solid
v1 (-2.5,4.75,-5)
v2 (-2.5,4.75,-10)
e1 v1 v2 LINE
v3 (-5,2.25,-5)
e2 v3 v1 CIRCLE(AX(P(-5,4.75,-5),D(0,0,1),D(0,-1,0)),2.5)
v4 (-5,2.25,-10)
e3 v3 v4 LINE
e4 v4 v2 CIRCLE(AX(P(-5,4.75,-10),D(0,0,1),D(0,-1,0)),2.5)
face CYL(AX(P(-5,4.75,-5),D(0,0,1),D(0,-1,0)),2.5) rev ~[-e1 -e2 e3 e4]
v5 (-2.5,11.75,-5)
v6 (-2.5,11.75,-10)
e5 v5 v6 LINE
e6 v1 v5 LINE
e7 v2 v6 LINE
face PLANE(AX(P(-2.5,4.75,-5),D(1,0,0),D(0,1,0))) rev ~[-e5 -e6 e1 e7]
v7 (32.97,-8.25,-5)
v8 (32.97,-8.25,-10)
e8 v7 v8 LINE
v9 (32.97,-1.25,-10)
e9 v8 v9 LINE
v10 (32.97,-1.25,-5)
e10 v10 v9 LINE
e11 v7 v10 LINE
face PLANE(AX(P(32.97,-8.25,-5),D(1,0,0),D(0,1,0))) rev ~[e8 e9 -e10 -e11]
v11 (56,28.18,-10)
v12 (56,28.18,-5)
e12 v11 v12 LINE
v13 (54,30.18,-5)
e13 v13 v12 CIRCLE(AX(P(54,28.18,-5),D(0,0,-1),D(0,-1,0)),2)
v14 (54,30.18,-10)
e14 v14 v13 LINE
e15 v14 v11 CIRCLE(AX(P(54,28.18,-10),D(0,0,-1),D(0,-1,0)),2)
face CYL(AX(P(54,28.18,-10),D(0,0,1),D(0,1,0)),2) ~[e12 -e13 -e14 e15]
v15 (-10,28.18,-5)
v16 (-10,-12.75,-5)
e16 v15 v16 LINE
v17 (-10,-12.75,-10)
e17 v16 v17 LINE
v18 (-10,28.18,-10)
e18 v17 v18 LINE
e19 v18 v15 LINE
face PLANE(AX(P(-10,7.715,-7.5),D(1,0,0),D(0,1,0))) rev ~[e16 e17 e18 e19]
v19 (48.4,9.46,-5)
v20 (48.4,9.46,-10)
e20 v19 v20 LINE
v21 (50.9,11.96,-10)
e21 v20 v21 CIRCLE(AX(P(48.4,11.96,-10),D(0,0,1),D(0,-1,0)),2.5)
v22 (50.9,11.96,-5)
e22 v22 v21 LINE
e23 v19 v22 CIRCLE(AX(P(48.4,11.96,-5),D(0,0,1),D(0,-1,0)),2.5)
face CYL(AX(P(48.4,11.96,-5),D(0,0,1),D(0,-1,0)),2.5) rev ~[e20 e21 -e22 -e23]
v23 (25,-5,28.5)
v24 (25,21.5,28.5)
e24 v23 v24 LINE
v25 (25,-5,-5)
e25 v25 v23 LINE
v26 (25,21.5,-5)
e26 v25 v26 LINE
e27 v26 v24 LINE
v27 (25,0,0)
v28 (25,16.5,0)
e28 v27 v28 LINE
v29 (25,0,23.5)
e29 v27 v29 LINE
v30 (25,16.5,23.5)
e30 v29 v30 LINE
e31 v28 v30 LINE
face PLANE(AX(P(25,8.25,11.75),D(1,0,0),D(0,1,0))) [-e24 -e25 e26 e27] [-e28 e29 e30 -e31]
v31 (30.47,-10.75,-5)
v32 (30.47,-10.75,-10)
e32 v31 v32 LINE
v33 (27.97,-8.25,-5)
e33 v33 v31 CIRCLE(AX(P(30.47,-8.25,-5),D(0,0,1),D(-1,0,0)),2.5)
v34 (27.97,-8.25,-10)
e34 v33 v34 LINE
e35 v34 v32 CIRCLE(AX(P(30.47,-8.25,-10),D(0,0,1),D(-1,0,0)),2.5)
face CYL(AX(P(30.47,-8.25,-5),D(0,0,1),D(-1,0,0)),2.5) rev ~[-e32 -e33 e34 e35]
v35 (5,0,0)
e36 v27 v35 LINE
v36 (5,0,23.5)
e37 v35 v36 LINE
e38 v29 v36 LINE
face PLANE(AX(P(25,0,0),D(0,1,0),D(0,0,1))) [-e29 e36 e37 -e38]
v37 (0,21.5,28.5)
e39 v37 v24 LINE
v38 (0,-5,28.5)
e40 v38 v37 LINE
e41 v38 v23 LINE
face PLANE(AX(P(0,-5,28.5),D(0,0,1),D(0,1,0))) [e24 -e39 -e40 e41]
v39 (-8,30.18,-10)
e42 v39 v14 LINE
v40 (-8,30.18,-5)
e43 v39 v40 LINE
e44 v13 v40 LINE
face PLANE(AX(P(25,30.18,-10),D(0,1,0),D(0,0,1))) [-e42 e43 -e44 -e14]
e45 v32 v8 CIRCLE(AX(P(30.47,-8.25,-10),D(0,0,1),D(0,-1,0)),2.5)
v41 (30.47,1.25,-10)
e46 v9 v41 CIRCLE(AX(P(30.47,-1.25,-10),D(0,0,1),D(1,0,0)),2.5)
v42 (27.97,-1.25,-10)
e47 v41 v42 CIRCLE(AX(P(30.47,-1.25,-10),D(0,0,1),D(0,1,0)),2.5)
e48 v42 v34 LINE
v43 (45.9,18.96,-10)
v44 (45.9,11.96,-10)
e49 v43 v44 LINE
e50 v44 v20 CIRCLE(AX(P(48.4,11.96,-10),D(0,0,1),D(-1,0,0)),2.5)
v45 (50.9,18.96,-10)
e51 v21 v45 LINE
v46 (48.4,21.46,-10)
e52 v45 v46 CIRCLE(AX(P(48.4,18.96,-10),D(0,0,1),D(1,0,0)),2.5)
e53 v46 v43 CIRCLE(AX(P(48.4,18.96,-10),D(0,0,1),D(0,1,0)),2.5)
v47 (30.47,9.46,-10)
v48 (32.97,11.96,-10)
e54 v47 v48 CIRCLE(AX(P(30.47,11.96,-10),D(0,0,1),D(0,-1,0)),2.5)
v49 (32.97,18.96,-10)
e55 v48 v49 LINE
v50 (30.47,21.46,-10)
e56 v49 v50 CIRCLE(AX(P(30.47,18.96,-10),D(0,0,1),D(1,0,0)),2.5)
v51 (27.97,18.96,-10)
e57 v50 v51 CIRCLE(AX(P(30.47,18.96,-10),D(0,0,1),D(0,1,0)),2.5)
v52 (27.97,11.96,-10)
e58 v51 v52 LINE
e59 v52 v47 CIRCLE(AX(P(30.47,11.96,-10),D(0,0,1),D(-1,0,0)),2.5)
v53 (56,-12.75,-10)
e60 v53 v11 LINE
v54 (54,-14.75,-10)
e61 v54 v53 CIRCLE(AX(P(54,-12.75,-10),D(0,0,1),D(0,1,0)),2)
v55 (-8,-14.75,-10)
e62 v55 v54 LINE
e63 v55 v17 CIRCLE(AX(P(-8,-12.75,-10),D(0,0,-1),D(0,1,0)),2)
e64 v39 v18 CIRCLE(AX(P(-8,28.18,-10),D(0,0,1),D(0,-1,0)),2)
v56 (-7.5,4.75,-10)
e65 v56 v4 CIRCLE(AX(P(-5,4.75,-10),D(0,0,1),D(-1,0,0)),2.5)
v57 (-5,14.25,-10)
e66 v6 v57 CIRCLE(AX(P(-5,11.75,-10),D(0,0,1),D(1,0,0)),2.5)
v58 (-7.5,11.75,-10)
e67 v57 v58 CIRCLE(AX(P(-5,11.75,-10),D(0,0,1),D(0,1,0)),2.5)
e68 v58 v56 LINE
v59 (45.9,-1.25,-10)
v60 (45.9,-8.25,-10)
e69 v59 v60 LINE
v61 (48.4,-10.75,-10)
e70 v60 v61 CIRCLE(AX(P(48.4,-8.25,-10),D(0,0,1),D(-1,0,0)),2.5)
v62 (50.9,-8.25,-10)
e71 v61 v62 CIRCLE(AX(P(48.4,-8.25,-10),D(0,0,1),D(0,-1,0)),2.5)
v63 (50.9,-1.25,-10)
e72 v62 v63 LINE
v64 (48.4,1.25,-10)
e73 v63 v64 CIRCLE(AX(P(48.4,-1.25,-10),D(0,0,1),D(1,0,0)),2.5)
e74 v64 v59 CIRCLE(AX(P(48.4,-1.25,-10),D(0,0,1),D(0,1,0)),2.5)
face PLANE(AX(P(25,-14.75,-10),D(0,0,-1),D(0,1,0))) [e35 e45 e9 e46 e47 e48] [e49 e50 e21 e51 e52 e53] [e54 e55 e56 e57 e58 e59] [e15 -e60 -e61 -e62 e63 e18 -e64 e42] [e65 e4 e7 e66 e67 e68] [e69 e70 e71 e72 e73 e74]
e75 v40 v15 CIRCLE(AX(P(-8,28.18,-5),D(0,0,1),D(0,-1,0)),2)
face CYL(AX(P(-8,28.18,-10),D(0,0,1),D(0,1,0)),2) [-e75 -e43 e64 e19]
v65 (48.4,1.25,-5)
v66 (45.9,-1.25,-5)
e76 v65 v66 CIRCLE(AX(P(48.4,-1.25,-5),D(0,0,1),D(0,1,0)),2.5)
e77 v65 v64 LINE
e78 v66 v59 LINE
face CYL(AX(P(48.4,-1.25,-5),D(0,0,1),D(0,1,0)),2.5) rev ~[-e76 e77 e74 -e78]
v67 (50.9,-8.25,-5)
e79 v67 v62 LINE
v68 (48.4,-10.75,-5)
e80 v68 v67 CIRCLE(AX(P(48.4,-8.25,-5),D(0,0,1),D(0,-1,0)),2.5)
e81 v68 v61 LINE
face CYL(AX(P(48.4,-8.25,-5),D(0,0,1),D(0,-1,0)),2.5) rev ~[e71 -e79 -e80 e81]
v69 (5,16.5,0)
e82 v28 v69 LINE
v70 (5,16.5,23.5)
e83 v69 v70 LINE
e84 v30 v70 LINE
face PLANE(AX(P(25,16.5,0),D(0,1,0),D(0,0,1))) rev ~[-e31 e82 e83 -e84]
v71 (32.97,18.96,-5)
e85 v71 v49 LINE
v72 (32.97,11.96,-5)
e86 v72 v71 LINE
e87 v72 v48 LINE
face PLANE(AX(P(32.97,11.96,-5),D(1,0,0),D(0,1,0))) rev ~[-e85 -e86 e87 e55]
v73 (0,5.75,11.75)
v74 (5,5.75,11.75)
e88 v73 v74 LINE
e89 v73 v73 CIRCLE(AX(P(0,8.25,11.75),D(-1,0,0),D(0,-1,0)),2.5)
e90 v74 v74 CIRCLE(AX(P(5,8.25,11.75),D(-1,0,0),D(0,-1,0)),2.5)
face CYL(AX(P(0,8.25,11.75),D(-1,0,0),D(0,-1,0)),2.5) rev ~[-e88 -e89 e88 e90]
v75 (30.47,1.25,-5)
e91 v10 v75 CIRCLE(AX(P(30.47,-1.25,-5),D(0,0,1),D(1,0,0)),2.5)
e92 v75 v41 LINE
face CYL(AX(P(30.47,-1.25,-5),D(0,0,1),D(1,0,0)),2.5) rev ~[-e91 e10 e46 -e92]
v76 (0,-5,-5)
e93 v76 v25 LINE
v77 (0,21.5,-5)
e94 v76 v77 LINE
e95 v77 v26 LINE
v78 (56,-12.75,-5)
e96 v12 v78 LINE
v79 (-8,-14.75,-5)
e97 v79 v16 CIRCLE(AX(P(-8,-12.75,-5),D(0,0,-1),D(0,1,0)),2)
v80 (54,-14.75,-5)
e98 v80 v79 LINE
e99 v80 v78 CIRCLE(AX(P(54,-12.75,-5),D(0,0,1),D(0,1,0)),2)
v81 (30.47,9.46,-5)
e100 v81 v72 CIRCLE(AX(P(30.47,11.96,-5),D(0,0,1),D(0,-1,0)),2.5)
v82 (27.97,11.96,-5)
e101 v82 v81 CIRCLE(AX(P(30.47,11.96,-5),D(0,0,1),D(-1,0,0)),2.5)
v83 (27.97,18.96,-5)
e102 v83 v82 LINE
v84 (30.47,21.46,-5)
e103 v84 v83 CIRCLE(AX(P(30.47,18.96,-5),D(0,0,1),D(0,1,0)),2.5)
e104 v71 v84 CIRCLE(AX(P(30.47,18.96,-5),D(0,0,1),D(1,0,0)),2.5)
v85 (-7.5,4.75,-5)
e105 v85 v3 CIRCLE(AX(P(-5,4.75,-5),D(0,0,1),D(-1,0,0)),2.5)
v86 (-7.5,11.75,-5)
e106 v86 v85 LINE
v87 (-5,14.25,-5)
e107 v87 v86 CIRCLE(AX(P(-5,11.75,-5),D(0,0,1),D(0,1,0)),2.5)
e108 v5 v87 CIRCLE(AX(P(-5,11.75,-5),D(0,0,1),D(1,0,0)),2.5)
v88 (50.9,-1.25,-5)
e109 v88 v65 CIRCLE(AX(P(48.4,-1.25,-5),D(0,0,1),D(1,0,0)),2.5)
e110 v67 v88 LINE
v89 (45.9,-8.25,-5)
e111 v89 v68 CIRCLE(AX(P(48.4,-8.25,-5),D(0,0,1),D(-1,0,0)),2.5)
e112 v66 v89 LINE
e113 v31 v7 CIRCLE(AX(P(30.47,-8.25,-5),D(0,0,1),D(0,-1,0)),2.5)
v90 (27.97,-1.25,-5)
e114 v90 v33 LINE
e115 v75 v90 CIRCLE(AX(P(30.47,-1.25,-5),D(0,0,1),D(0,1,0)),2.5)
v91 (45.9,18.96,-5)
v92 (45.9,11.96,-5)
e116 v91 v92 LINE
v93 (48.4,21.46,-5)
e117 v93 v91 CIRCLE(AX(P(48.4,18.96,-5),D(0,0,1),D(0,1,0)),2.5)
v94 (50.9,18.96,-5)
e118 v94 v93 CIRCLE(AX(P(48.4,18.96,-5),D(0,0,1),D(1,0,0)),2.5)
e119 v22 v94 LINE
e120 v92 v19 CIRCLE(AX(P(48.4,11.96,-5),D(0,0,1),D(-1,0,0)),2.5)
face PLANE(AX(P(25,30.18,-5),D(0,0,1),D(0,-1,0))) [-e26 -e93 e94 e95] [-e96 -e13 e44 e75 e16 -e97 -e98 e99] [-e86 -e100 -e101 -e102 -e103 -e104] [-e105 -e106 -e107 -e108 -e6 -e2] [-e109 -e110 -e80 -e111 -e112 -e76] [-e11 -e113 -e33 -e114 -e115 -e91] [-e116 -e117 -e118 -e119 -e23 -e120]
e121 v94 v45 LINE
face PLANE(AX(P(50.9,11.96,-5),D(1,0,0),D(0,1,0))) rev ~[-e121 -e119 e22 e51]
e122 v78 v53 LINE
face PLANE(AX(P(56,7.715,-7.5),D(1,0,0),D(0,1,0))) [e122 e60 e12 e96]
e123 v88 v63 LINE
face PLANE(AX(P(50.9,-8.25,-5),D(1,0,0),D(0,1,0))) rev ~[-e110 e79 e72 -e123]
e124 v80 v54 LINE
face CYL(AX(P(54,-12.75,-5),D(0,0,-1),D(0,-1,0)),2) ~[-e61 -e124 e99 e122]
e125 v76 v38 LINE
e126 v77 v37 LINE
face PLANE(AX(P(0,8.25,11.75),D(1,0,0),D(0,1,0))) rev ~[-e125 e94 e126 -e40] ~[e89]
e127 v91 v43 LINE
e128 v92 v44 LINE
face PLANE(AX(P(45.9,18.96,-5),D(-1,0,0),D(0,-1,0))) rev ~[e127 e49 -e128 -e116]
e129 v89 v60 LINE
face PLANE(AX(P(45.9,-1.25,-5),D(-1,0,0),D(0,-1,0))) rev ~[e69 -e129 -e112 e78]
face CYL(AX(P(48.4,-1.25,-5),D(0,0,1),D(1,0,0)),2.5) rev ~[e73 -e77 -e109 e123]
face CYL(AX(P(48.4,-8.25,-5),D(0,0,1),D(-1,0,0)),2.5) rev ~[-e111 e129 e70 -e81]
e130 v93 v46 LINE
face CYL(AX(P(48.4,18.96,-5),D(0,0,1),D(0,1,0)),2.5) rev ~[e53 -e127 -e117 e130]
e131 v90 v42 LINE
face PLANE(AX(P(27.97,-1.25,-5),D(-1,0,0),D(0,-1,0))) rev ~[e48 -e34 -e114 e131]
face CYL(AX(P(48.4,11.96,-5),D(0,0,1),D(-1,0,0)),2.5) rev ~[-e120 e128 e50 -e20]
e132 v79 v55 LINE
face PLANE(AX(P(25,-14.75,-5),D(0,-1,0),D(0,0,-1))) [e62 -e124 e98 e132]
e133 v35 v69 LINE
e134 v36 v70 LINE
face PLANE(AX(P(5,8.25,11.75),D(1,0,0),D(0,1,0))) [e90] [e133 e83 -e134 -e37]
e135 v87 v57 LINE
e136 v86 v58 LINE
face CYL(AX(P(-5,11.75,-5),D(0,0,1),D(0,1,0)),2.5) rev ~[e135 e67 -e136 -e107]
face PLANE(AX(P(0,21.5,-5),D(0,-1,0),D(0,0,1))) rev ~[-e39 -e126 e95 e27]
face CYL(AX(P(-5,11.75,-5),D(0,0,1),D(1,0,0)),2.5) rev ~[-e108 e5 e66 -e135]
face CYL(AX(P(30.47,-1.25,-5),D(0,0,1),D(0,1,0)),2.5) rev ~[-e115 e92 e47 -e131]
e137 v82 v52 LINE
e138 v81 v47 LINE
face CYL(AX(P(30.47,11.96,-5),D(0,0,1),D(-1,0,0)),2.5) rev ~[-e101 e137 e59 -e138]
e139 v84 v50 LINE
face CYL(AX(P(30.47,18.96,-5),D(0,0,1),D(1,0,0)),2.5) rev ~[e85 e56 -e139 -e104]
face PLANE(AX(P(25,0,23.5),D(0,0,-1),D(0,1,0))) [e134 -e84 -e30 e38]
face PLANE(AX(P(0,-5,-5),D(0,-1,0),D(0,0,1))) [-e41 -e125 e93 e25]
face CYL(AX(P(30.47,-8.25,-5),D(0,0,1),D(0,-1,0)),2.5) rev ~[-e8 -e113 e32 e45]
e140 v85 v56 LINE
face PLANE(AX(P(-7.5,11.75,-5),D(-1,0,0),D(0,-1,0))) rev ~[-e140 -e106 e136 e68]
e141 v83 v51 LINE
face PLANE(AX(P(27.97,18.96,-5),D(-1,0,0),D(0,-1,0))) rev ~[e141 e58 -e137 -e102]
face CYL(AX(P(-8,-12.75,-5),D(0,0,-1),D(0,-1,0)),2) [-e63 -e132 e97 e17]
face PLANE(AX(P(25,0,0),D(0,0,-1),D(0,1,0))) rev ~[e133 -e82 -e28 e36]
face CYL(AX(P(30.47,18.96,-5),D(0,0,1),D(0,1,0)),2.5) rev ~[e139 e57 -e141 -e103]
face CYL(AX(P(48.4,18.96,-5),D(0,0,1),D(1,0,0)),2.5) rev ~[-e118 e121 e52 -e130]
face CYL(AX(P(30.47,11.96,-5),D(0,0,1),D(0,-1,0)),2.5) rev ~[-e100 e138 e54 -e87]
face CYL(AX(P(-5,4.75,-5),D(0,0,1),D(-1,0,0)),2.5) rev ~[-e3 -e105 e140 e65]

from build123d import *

# Parameters (mm, degrees)
F0_W          = 26.5
F0_H          = 33.5
F1_DEPTH      = 25
F2_W          = 16.5
F2_H          = 23.5
F3_DEPTH      = 20
F4_R          = 2.5
F5_DEPTH      = 25.001
F7_DEPTH      = 31
F7_DEPTH_BACK = 35
F8_R          = 2
F10_DEPTH     = 5


# Not quite as in the source:
# - a feature names something its author has since deleted; it is built from what else it names


with BuildPart() as f1:
    # F0 (on Right) → F1 (new body)
    with BuildSketch(Plane.YZ):
        with Locations((8.25, 11.75)):
            Rectangle(F0_W, F0_H)
    extrude(amount=F1_DEPTH)

    # F2 (on face) → F3 (cut)
    with BuildSketch(Plane.YZ.offset(25)):
        with Locations((8.25, 11.75)):
            Rectangle(F2_W, F2_H)
    extrude(amount=-F3_DEPTH, mode=Mode.SUBTRACT)

    # F4 (on face) → F5 (cut, through all)
    with BuildSketch(Plane(origin=(0, 0, 0), x_dir=(0, -1, 0), z_dir=(-1, 0, 0))):
        with Locations((-8.25, 11.75)):
            Circle(F4_R)
    extrude(amount=-F5_DEPTH, mode=Mode.SUBTRACT)

    # F6 (on face) → F7 (join, two sides)
    with BuildSketch(Plane.YZ.offset(25)) as f7_sk:
        Polygon((-5, -5), (-14.75, -5), (-14.75, -10), (30.18, -10), (30.18, -5), (21.5, -5), align=None)
    extrude(amount=F7_DEPTH)
    extrude(f7_sk.sketch, amount=-F7_DEPTH_BACK)

    # F8
    f8_edges = [f1.edges().sort_by_distance(p)[0] for p in [
        (56, -14.75, -7.5),
        (56, 30.18, -7.5),
        (-10, -14.75, -7.5),
        (-10, 30.18, -7.5),
    ]]
    fillet(f8_edges, radius=F8_R)

    # F9 (on face) → F10 (cut, through all)
    with BuildSketch(Plane.XY.offset(-5)):
        with BuildLine():
            ThreePointArc((30.47, 21.46), (28.702233047, 20.727766953), (27.97, 18.96))
            Line((27.97, 18.96), (27.97, 11.96))
            ThreePointArc((27.97, 11.96), (28.702233047, 10.192233047), (30.47, 9.46))
            ThreePointArc((30.47, 9.46), (32.237766953, 10.192233047), (32.97, 11.96))
            Line((32.97, 11.96), (32.97, 18.96))
            ThreePointArc((32.97, 18.96), (32.237766953, 20.727766953), (30.47, 21.46))
        make_face()
        with BuildLine():
            ThreePointArc((30.47, 1.25), (28.702233047, 0.517766953), (27.97, -1.25))
            Line((27.97, -1.25), (27.97, -8.25))
            ThreePointArc((27.97, -8.25), (28.702233047, -10.017766953), (30.47, -10.75))
            ThreePointArc((30.47, -10.75), (32.237766953, -10.017766953), (32.97, -8.25))
            Line((32.97, -8.25), (32.97, -1.25))
            ThreePointArc((32.97, -1.25), (32.237766953, 0.517766953), (30.47, 1.25))
        make_face()
        with BuildLine():
            ThreePointArc((48.4, 21.46), (46.632233047, 20.727766953), (45.9, 18.96))
            Line((45.9, 18.96), (45.9, 11.96))
            ThreePointArc((45.9, 11.96), (46.632233047, 10.192233047), (48.4, 9.46))
            ThreePointArc((48.4, 9.46), (50.167766953, 10.192233047), (50.9, 11.96))
            Line((50.9, 11.96), (50.9, 18.96))
            ThreePointArc((50.9, 18.96), (50.167766953, 20.727766953), (48.4, 21.46))
        make_face()
        with BuildLine():
            ThreePointArc((48.4, 1.25), (46.632233047, 0.517766953), (45.9, -1.25))
            Line((45.9, -1.25), (45.9, -8.25))
            ThreePointArc((45.9, -8.25), (46.632233047, -10.017766953), (48.4, -10.75))
            ThreePointArc((48.4, -10.75), (50.167766953, -10.017766953), (50.9, -8.25))
            Line((50.9, -8.25), (50.9, -1.25))
            ThreePointArc((50.9, -1.25), (50.167766953, 0.517766953), (48.4, 1.25))
        make_face()
        with BuildLine():
            ThreePointArc((-5, 14.25), (-6.767766953, 13.517766953), (-7.5, 11.75))
            Line((-7.5, 11.75), (-7.5, 4.75))
            ThreePointArc((-7.5, 4.75), (-6.767766953, 2.982233047), (-5, 2.25))
            ThreePointArc((-5, 2.25), (-3.232233047, 2.982233047), (-2.5, 4.75))
            Line((-2.5, 4.75), (-2.5, 11.75))
            ThreePointArc((-2.5, 11.75), (-3.232233047, 13.517766953), (-5, 14.25))
        make_face()
    extrude(amount=-F10_DEPTH, mode=Mode.SUBTRACT)


solid = f1.part
